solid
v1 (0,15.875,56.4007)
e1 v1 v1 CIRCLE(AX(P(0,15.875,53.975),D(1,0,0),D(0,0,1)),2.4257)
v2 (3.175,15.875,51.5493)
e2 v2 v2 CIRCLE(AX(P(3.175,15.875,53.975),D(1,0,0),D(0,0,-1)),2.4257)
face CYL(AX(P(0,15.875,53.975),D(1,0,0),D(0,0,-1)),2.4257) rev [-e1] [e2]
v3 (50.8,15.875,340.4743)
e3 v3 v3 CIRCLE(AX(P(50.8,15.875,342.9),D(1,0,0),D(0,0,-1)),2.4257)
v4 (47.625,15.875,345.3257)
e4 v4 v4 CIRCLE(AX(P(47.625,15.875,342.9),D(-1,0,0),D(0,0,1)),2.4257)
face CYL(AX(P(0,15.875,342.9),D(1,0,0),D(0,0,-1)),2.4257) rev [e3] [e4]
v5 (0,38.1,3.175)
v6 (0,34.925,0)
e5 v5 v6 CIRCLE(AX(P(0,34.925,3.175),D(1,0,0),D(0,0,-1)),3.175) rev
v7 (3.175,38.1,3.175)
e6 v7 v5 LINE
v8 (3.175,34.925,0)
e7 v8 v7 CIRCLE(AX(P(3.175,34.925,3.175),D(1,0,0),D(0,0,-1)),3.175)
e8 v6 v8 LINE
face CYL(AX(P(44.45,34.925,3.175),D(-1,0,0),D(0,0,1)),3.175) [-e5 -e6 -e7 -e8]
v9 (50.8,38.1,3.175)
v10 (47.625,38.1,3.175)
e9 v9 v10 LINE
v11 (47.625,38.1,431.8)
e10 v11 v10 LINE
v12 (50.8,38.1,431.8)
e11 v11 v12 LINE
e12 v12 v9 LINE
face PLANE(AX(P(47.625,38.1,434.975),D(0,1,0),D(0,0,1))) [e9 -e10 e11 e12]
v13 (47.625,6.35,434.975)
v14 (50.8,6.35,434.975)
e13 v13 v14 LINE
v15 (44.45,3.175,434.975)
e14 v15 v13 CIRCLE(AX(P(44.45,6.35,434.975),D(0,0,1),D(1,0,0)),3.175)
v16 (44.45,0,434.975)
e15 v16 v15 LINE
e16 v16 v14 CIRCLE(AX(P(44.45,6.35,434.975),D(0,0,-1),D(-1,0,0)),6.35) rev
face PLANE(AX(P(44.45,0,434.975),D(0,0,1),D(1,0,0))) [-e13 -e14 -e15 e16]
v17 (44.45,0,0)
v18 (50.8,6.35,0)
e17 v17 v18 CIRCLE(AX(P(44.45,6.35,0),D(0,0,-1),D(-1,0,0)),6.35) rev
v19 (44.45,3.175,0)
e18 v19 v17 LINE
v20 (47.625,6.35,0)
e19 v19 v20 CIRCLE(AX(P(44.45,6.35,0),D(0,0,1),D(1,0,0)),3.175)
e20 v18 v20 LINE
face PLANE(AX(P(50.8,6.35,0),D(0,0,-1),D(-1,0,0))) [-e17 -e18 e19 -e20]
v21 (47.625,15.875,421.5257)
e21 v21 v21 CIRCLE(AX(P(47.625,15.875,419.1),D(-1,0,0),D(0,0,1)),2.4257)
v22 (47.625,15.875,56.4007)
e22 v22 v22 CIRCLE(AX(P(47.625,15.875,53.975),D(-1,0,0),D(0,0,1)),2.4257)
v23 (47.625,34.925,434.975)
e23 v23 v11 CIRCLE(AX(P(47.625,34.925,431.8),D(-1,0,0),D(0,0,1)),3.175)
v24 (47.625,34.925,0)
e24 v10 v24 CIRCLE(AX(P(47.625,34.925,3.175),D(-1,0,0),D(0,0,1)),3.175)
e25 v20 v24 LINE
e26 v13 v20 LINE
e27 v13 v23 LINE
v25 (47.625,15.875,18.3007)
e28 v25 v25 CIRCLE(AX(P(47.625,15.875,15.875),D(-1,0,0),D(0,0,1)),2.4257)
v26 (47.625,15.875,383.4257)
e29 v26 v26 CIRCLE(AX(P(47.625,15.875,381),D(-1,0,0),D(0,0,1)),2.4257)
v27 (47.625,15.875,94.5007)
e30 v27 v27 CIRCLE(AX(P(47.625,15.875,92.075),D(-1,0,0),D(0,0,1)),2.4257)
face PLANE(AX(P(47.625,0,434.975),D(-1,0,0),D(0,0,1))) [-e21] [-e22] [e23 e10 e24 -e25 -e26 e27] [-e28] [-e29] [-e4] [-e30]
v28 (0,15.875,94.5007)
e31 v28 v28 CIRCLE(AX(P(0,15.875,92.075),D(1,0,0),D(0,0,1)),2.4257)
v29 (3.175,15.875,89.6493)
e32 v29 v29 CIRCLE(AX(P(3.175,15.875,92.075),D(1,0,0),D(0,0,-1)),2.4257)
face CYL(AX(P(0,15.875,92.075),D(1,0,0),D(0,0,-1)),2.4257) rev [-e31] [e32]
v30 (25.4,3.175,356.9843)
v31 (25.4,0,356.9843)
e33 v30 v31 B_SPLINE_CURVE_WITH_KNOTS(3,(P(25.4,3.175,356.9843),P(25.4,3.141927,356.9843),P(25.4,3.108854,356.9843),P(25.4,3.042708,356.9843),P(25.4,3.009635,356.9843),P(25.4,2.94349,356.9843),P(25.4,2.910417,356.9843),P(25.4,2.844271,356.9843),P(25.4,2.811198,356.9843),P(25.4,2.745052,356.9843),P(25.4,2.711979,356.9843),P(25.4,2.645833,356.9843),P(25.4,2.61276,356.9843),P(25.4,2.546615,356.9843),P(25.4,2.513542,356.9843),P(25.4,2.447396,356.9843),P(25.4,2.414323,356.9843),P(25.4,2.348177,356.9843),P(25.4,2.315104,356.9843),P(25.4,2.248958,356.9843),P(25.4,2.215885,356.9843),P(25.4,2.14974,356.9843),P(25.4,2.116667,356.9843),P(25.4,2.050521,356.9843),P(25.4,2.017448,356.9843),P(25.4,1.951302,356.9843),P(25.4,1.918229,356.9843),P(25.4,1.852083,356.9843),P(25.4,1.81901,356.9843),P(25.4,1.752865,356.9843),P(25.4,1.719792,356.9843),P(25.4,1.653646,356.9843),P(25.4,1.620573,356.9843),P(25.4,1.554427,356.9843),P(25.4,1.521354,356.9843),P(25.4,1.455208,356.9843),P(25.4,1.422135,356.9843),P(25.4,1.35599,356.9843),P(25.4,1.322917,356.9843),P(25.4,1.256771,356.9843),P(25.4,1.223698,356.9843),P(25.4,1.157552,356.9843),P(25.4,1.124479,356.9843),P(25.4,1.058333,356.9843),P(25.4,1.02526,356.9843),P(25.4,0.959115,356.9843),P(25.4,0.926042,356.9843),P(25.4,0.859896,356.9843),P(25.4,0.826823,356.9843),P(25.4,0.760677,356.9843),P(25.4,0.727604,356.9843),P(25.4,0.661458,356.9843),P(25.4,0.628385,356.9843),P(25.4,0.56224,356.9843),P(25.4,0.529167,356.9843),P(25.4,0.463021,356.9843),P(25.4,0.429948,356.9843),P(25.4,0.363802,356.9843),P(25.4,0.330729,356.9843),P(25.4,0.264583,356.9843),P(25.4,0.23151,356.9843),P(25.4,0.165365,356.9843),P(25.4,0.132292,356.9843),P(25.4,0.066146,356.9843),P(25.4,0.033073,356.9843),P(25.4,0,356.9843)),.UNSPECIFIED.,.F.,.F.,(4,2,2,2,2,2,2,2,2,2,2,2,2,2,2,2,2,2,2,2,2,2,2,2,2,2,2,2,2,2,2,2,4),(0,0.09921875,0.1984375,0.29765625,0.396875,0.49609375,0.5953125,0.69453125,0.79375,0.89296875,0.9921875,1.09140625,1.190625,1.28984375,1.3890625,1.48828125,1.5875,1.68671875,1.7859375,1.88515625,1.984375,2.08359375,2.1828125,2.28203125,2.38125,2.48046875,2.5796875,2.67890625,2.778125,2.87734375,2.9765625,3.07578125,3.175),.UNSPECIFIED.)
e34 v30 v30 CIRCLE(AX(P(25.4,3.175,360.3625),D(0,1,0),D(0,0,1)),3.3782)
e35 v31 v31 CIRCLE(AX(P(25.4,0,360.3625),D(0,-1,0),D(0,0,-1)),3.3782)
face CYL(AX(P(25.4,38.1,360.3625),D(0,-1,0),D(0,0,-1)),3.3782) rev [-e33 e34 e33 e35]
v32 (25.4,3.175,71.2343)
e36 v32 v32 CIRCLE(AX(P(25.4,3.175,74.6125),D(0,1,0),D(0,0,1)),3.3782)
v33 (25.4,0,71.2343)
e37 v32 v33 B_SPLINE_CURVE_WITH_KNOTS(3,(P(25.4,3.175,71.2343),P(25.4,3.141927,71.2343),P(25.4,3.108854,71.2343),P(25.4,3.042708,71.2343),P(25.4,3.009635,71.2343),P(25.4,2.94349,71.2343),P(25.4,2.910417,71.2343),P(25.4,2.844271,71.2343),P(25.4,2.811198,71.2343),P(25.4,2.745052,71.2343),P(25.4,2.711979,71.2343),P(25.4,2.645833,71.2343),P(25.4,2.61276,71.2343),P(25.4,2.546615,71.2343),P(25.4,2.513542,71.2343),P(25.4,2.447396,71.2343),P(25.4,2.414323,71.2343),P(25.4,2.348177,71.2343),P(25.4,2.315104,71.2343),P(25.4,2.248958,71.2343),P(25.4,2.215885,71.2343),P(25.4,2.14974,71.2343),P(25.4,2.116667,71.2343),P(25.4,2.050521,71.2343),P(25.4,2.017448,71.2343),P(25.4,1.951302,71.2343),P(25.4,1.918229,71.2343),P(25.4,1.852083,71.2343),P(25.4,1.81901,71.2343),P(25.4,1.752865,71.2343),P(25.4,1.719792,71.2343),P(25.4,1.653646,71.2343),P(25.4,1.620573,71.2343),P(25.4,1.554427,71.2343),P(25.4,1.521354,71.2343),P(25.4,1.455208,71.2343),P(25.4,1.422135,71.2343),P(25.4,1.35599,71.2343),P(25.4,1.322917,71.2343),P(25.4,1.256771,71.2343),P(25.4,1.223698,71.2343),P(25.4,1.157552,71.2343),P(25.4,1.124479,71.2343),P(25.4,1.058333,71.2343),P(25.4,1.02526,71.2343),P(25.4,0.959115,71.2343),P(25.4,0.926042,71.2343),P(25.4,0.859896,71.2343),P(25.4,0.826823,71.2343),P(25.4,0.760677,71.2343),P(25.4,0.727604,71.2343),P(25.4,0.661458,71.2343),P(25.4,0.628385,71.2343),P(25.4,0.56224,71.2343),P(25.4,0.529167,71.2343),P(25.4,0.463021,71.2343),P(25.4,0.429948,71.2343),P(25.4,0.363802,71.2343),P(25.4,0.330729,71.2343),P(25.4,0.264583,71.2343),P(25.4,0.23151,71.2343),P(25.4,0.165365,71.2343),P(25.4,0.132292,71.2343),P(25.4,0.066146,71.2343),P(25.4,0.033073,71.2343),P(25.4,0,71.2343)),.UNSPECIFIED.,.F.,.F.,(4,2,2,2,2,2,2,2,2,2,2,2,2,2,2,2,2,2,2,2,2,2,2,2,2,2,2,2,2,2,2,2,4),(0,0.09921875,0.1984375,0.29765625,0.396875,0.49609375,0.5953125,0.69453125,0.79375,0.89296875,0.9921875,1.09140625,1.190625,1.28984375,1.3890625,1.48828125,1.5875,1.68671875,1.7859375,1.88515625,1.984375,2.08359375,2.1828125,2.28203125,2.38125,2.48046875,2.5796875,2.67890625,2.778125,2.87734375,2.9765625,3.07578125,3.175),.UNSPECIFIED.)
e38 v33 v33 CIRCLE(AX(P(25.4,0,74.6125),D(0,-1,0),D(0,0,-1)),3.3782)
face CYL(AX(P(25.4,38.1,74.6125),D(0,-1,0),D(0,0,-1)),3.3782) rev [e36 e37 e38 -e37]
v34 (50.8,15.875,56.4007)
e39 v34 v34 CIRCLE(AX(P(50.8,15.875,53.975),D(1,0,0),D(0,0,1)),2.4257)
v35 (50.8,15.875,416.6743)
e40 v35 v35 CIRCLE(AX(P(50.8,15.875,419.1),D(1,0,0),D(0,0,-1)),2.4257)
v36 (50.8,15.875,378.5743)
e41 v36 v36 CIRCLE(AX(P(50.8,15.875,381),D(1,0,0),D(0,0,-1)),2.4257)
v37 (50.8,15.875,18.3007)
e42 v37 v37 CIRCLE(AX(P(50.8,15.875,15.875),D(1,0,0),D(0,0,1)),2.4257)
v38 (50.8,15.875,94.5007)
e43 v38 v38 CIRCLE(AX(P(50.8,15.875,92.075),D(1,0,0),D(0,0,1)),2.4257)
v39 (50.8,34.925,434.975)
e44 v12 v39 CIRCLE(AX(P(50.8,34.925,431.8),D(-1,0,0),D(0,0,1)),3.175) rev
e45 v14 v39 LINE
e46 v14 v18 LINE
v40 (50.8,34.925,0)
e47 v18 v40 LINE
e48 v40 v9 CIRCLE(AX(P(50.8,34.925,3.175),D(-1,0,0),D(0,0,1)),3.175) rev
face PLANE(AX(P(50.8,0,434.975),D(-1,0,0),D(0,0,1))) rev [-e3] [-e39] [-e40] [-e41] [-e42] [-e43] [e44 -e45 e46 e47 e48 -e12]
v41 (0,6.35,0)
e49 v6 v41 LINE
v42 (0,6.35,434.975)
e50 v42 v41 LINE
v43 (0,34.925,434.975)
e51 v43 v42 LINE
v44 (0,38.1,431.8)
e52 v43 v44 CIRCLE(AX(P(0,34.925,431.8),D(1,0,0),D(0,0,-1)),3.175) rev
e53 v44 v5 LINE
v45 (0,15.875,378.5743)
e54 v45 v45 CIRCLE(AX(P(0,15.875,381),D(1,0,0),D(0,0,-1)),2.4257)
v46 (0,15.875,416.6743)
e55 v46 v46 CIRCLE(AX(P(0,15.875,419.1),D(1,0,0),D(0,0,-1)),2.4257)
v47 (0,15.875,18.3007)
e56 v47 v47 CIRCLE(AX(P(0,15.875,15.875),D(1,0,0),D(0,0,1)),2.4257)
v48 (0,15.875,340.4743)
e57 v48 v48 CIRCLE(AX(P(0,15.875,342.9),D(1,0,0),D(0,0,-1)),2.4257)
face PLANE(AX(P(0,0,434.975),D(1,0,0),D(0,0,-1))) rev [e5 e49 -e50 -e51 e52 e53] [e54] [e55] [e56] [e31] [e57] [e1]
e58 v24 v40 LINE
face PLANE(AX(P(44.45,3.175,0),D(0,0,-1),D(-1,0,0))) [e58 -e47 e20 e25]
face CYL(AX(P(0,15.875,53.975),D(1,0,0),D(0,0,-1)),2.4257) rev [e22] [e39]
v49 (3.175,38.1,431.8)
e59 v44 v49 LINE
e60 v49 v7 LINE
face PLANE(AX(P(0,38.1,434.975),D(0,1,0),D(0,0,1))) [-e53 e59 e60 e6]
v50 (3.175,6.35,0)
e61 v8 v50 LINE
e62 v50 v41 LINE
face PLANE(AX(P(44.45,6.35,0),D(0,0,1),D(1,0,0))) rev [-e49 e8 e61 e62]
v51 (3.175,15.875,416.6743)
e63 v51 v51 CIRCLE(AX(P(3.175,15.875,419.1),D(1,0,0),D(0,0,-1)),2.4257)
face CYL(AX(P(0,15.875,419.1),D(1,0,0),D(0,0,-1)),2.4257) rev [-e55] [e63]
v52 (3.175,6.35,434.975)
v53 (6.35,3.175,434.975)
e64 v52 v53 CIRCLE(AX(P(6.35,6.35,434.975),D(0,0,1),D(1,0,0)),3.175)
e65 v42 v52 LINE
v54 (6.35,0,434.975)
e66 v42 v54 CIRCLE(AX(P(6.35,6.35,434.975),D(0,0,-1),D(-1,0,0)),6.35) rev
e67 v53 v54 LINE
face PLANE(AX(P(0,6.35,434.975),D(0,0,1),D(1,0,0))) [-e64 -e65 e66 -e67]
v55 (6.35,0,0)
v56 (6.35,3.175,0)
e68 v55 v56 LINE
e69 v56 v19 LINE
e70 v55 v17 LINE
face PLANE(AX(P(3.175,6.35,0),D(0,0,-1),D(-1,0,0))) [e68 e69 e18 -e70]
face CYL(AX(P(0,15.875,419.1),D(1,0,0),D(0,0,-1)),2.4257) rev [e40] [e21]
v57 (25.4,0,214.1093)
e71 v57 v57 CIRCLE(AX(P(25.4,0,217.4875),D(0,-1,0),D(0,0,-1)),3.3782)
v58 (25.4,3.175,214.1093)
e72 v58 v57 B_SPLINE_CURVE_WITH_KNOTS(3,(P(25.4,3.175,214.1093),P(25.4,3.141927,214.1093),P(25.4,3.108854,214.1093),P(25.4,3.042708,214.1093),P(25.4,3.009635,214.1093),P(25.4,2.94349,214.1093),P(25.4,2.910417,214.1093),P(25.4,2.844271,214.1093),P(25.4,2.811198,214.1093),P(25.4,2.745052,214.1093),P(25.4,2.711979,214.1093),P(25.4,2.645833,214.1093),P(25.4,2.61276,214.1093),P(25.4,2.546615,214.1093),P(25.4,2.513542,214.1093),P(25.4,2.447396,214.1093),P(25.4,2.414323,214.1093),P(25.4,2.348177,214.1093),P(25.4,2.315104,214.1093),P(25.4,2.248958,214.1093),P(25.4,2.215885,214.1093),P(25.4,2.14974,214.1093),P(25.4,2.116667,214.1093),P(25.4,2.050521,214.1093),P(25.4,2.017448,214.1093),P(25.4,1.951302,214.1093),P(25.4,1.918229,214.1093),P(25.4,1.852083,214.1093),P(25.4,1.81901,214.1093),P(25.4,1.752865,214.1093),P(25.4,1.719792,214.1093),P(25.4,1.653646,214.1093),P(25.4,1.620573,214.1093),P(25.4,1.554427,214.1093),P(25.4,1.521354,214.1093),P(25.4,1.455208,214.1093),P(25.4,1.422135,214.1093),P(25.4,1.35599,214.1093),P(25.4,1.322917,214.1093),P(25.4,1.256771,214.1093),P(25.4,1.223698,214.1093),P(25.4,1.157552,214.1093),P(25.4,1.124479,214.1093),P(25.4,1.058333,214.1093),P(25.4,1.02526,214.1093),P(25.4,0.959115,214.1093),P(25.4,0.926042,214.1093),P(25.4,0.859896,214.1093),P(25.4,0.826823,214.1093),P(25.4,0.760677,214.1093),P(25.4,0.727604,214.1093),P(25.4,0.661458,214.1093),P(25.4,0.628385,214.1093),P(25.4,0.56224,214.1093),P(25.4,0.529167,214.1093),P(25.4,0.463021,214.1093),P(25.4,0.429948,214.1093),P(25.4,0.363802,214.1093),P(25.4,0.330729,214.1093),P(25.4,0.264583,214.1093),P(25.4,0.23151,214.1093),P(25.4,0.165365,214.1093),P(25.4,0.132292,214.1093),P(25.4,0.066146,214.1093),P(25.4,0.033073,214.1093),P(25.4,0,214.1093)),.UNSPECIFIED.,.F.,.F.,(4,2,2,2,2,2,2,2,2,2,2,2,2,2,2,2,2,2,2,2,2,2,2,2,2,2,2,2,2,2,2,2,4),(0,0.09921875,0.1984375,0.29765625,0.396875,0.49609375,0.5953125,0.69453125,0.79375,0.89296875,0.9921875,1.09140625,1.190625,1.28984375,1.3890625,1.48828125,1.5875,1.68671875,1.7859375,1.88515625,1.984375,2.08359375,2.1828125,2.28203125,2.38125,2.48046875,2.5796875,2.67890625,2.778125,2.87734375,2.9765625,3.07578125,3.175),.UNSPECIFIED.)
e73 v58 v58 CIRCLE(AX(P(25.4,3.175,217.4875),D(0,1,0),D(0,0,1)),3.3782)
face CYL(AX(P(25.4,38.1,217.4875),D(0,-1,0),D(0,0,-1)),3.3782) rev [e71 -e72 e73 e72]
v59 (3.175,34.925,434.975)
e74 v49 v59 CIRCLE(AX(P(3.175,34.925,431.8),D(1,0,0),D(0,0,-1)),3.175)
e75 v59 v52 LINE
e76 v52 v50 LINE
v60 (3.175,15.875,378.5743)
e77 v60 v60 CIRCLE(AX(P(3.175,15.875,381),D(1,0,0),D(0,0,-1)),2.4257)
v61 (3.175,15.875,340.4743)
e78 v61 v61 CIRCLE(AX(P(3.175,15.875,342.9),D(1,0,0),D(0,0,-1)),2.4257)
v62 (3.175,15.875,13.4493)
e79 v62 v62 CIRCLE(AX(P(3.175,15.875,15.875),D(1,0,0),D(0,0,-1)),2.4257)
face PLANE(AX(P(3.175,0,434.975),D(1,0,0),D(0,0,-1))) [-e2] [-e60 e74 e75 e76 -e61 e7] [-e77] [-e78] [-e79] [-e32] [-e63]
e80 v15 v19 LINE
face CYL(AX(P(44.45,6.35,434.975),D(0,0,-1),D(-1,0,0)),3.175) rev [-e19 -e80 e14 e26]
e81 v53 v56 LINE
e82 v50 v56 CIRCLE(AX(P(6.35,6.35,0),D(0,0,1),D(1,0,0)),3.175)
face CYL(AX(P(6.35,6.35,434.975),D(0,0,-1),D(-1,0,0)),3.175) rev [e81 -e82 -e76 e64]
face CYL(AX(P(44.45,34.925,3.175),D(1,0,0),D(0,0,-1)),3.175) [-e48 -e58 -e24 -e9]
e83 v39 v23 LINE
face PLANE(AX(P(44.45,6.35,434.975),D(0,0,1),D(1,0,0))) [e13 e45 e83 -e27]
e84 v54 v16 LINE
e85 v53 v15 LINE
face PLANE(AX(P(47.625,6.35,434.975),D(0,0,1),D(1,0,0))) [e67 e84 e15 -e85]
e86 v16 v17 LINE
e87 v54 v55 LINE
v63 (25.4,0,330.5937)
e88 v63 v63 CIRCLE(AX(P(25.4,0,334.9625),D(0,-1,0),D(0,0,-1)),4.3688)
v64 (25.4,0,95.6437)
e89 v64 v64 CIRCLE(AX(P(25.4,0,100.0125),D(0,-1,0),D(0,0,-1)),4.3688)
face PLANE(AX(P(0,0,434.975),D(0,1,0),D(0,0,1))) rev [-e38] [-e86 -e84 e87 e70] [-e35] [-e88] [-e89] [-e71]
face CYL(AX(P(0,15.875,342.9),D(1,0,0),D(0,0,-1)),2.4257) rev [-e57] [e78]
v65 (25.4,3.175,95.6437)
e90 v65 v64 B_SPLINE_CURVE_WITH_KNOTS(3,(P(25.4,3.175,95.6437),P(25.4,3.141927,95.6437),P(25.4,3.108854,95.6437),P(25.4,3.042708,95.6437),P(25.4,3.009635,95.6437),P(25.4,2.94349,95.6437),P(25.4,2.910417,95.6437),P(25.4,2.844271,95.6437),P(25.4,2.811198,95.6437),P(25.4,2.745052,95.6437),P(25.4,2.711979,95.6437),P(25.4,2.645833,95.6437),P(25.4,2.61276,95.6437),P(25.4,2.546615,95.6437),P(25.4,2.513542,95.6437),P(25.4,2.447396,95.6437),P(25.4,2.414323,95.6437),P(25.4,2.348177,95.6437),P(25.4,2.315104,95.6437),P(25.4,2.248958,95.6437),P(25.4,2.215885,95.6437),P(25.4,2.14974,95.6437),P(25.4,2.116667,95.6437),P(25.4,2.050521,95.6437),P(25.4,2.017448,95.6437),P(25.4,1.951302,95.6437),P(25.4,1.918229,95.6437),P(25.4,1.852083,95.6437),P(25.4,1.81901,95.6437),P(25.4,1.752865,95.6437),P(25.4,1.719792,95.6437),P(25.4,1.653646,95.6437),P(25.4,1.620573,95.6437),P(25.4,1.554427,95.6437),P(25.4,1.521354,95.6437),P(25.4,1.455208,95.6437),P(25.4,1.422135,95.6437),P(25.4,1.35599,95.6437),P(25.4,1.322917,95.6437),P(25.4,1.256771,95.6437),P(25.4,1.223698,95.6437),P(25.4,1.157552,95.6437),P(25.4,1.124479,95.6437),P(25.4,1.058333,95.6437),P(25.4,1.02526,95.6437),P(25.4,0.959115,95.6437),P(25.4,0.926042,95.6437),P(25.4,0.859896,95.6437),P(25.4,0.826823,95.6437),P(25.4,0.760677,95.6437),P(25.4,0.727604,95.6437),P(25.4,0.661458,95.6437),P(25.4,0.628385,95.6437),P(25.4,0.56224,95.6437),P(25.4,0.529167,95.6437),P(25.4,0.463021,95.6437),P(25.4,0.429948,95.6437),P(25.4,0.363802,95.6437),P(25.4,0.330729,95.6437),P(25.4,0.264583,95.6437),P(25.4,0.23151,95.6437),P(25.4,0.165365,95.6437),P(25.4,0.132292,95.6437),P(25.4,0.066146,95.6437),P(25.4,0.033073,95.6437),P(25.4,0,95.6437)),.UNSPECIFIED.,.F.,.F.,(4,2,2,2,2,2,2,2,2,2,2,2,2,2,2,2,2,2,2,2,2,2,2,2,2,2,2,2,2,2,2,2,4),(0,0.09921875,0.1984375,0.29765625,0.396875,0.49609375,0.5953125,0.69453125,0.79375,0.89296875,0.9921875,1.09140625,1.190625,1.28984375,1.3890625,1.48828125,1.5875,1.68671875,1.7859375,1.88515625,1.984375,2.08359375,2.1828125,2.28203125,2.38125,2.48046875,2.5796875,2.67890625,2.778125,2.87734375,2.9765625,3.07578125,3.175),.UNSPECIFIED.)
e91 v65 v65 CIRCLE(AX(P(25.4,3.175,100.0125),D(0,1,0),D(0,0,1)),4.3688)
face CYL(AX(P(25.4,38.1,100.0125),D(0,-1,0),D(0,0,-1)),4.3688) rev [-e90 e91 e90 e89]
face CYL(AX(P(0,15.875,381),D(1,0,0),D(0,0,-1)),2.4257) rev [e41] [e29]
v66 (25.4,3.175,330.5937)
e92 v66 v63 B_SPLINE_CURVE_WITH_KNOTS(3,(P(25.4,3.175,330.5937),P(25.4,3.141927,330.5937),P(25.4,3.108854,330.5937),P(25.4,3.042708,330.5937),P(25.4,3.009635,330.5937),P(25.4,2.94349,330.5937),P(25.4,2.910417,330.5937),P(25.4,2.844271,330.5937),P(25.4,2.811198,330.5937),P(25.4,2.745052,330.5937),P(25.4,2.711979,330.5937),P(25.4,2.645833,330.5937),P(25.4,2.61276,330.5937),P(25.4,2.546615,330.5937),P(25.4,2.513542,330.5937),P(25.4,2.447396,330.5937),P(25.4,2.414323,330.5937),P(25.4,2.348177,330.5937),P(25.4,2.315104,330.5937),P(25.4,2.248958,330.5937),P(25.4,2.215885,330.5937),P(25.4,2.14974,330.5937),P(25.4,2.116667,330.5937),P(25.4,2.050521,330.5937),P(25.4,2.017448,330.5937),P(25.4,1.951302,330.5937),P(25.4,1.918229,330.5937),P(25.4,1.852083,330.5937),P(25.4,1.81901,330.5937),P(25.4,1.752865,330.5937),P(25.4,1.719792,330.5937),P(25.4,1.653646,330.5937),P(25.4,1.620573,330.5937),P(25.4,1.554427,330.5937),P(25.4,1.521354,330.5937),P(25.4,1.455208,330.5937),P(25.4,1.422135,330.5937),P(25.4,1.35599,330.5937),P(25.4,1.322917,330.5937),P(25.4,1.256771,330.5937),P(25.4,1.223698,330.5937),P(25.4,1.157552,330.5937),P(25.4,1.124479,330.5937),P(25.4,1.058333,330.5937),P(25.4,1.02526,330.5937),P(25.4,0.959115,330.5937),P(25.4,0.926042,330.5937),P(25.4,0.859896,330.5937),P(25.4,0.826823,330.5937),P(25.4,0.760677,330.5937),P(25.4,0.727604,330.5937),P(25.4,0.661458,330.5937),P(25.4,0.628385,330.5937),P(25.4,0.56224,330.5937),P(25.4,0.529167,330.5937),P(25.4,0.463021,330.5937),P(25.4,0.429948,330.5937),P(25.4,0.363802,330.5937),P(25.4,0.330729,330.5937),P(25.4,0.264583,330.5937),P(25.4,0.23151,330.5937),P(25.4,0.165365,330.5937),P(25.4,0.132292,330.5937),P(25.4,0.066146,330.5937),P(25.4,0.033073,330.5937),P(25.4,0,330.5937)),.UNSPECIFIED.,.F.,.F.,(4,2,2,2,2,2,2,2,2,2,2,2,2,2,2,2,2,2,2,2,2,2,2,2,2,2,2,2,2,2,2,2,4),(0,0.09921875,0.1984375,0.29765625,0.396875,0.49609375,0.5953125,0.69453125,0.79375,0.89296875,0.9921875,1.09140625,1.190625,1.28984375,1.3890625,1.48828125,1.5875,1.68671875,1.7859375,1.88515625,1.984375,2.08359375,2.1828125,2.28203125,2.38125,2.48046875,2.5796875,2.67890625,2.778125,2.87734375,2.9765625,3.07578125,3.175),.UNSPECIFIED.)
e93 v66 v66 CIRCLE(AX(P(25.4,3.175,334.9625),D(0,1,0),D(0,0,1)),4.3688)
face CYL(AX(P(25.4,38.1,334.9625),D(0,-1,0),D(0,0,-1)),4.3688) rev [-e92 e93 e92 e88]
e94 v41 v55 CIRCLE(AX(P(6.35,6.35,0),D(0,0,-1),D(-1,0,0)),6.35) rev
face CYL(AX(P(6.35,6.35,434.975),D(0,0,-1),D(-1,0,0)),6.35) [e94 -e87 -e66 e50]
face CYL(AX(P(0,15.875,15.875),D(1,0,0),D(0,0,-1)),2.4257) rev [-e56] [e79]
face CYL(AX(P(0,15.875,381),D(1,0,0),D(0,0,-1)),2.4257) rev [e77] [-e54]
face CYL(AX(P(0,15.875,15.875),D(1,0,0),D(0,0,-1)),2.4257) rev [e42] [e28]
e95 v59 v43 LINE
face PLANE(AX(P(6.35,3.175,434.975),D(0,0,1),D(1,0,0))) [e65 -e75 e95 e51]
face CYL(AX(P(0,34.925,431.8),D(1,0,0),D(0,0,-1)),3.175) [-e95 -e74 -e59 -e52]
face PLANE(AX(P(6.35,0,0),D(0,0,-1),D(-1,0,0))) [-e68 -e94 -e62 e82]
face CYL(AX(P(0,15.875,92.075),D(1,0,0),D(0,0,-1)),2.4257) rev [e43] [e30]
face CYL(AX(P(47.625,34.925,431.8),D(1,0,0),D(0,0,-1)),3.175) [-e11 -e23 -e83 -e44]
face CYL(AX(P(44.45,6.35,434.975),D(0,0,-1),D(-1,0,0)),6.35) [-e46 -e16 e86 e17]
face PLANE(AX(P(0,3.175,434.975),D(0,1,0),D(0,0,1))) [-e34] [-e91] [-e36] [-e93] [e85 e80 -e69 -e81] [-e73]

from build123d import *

# Parameters (mm, degrees)
BASE_FLANGE1_DEPTH = 434.975
SKETCH8_R          = 4.3688
SKETCH8_R_2        = 3.3782
CUT_EXTRUDE2_DEPTH = 440.585601021
SKETCH9_R          = 2.4257
CUT_EXTRUDE3_DEPTH = 440.585601021
FILLET1_R          = 3.175


# Sheet-metal steps are written as plain solids
with BuildPart() as part:
    # Sketch1 → Base-Flange1 (new body)
    with BuildSketch(Plane.XY):
        with BuildLine():
            Line((50.8, 38.1), (50.8, 6.35))
            ThreePointArc((50.8, 6.35), (48.940128061, 1.859871939), (44.45, 0))
            Line((44.45, 0), (6.35, 0))
            ThreePointArc((6.35, 0), (1.859871939, 1.859871939), (0, 6.35))
            Line((0, 6.35), (0, 38.1))
            Line((0, 38.1), (3.175, 38.1))
            Line((3.175, 38.1), (3.175, 6.35))
            ThreePointArc((3.175, 6.35), (4.10493597, 4.10493597), (6.35, 3.175))
            Line((6.35, 3.175), (44.45, 3.175))
            ThreePointArc((44.45, 3.175), (46.69506403, 4.10493597), (47.625, 6.35))
            Line((47.625, 6.35), (47.625, 38.1))
            Line((47.625, 38.1), (50.8, 38.1))
        make_face()
    extrude(amount=BASE_FLANGE1_DEPTH)

    # Sketch8 → Cut-Extrude2 (cut, through all)
    with BuildSketch(Plane.XZ):
        with Locations(Location((25.4, 100.0125, 0), (0, 0, 270))):
            Circle(SKETCH8_R)
        with Locations(Location((25.4, 334.9625, 0), (0, 0, 270))):
            Circle(SKETCH8_R)
        with Locations(Location((25.4, 217.4875, 0), (0, 0, 270))):
            Circle(SKETCH8_R_2)
        with Locations(Location((25.4, 74.6125, 0), (0, 0, 270))):
            Circle(SKETCH8_R_2)
        with Locations(Location((25.4, 360.3625, 0), (0, 0, 270))):
            Circle(SKETCH8_R_2)
    extrude(amount=-CUT_EXTRUDE2_DEPTH, mode=Mode.SUBTRACT)

    # Sketch9 → Cut-Extrude3 (cut, through all)
    with BuildSketch(Plane(origin=(50.8, 0, 0), x_dir=(0, 0, -1), z_dir=(1, 0, 0))):
        with Locations((-419.1, 15.875)):
            Circle(SKETCH9_R)
        with Locations((-381, 15.875)):
            Circle(SKETCH9_R)
        with Locations((-342.9, 15.875)):
            Circle(SKETCH9_R)
        with Locations((-92.075, 15.875)):
            Circle(SKETCH9_R)
        with Locations((-53.975, 15.875)):
            Circle(SKETCH9_R)
        with Locations((-15.875, 15.875)):
            Circle(SKETCH9_R)
    extrude(amount=-CUT_EXTRUDE3_DEPTH, mode=Mode.SUBTRACT)

    # Fillet1
    fillet1_edges = [part.edges().sort_by_distance(p)[0] for p in [
        (1.5875, 38.1, 0),
        (49.2125, 38.1, 0),
        (1.5875, 38.1, 434.975),
        (49.2125, 38.1, 434.975),
    ]]
    fillet(fillet1_edges, radius=FILLET1_R)


solid = part.part
